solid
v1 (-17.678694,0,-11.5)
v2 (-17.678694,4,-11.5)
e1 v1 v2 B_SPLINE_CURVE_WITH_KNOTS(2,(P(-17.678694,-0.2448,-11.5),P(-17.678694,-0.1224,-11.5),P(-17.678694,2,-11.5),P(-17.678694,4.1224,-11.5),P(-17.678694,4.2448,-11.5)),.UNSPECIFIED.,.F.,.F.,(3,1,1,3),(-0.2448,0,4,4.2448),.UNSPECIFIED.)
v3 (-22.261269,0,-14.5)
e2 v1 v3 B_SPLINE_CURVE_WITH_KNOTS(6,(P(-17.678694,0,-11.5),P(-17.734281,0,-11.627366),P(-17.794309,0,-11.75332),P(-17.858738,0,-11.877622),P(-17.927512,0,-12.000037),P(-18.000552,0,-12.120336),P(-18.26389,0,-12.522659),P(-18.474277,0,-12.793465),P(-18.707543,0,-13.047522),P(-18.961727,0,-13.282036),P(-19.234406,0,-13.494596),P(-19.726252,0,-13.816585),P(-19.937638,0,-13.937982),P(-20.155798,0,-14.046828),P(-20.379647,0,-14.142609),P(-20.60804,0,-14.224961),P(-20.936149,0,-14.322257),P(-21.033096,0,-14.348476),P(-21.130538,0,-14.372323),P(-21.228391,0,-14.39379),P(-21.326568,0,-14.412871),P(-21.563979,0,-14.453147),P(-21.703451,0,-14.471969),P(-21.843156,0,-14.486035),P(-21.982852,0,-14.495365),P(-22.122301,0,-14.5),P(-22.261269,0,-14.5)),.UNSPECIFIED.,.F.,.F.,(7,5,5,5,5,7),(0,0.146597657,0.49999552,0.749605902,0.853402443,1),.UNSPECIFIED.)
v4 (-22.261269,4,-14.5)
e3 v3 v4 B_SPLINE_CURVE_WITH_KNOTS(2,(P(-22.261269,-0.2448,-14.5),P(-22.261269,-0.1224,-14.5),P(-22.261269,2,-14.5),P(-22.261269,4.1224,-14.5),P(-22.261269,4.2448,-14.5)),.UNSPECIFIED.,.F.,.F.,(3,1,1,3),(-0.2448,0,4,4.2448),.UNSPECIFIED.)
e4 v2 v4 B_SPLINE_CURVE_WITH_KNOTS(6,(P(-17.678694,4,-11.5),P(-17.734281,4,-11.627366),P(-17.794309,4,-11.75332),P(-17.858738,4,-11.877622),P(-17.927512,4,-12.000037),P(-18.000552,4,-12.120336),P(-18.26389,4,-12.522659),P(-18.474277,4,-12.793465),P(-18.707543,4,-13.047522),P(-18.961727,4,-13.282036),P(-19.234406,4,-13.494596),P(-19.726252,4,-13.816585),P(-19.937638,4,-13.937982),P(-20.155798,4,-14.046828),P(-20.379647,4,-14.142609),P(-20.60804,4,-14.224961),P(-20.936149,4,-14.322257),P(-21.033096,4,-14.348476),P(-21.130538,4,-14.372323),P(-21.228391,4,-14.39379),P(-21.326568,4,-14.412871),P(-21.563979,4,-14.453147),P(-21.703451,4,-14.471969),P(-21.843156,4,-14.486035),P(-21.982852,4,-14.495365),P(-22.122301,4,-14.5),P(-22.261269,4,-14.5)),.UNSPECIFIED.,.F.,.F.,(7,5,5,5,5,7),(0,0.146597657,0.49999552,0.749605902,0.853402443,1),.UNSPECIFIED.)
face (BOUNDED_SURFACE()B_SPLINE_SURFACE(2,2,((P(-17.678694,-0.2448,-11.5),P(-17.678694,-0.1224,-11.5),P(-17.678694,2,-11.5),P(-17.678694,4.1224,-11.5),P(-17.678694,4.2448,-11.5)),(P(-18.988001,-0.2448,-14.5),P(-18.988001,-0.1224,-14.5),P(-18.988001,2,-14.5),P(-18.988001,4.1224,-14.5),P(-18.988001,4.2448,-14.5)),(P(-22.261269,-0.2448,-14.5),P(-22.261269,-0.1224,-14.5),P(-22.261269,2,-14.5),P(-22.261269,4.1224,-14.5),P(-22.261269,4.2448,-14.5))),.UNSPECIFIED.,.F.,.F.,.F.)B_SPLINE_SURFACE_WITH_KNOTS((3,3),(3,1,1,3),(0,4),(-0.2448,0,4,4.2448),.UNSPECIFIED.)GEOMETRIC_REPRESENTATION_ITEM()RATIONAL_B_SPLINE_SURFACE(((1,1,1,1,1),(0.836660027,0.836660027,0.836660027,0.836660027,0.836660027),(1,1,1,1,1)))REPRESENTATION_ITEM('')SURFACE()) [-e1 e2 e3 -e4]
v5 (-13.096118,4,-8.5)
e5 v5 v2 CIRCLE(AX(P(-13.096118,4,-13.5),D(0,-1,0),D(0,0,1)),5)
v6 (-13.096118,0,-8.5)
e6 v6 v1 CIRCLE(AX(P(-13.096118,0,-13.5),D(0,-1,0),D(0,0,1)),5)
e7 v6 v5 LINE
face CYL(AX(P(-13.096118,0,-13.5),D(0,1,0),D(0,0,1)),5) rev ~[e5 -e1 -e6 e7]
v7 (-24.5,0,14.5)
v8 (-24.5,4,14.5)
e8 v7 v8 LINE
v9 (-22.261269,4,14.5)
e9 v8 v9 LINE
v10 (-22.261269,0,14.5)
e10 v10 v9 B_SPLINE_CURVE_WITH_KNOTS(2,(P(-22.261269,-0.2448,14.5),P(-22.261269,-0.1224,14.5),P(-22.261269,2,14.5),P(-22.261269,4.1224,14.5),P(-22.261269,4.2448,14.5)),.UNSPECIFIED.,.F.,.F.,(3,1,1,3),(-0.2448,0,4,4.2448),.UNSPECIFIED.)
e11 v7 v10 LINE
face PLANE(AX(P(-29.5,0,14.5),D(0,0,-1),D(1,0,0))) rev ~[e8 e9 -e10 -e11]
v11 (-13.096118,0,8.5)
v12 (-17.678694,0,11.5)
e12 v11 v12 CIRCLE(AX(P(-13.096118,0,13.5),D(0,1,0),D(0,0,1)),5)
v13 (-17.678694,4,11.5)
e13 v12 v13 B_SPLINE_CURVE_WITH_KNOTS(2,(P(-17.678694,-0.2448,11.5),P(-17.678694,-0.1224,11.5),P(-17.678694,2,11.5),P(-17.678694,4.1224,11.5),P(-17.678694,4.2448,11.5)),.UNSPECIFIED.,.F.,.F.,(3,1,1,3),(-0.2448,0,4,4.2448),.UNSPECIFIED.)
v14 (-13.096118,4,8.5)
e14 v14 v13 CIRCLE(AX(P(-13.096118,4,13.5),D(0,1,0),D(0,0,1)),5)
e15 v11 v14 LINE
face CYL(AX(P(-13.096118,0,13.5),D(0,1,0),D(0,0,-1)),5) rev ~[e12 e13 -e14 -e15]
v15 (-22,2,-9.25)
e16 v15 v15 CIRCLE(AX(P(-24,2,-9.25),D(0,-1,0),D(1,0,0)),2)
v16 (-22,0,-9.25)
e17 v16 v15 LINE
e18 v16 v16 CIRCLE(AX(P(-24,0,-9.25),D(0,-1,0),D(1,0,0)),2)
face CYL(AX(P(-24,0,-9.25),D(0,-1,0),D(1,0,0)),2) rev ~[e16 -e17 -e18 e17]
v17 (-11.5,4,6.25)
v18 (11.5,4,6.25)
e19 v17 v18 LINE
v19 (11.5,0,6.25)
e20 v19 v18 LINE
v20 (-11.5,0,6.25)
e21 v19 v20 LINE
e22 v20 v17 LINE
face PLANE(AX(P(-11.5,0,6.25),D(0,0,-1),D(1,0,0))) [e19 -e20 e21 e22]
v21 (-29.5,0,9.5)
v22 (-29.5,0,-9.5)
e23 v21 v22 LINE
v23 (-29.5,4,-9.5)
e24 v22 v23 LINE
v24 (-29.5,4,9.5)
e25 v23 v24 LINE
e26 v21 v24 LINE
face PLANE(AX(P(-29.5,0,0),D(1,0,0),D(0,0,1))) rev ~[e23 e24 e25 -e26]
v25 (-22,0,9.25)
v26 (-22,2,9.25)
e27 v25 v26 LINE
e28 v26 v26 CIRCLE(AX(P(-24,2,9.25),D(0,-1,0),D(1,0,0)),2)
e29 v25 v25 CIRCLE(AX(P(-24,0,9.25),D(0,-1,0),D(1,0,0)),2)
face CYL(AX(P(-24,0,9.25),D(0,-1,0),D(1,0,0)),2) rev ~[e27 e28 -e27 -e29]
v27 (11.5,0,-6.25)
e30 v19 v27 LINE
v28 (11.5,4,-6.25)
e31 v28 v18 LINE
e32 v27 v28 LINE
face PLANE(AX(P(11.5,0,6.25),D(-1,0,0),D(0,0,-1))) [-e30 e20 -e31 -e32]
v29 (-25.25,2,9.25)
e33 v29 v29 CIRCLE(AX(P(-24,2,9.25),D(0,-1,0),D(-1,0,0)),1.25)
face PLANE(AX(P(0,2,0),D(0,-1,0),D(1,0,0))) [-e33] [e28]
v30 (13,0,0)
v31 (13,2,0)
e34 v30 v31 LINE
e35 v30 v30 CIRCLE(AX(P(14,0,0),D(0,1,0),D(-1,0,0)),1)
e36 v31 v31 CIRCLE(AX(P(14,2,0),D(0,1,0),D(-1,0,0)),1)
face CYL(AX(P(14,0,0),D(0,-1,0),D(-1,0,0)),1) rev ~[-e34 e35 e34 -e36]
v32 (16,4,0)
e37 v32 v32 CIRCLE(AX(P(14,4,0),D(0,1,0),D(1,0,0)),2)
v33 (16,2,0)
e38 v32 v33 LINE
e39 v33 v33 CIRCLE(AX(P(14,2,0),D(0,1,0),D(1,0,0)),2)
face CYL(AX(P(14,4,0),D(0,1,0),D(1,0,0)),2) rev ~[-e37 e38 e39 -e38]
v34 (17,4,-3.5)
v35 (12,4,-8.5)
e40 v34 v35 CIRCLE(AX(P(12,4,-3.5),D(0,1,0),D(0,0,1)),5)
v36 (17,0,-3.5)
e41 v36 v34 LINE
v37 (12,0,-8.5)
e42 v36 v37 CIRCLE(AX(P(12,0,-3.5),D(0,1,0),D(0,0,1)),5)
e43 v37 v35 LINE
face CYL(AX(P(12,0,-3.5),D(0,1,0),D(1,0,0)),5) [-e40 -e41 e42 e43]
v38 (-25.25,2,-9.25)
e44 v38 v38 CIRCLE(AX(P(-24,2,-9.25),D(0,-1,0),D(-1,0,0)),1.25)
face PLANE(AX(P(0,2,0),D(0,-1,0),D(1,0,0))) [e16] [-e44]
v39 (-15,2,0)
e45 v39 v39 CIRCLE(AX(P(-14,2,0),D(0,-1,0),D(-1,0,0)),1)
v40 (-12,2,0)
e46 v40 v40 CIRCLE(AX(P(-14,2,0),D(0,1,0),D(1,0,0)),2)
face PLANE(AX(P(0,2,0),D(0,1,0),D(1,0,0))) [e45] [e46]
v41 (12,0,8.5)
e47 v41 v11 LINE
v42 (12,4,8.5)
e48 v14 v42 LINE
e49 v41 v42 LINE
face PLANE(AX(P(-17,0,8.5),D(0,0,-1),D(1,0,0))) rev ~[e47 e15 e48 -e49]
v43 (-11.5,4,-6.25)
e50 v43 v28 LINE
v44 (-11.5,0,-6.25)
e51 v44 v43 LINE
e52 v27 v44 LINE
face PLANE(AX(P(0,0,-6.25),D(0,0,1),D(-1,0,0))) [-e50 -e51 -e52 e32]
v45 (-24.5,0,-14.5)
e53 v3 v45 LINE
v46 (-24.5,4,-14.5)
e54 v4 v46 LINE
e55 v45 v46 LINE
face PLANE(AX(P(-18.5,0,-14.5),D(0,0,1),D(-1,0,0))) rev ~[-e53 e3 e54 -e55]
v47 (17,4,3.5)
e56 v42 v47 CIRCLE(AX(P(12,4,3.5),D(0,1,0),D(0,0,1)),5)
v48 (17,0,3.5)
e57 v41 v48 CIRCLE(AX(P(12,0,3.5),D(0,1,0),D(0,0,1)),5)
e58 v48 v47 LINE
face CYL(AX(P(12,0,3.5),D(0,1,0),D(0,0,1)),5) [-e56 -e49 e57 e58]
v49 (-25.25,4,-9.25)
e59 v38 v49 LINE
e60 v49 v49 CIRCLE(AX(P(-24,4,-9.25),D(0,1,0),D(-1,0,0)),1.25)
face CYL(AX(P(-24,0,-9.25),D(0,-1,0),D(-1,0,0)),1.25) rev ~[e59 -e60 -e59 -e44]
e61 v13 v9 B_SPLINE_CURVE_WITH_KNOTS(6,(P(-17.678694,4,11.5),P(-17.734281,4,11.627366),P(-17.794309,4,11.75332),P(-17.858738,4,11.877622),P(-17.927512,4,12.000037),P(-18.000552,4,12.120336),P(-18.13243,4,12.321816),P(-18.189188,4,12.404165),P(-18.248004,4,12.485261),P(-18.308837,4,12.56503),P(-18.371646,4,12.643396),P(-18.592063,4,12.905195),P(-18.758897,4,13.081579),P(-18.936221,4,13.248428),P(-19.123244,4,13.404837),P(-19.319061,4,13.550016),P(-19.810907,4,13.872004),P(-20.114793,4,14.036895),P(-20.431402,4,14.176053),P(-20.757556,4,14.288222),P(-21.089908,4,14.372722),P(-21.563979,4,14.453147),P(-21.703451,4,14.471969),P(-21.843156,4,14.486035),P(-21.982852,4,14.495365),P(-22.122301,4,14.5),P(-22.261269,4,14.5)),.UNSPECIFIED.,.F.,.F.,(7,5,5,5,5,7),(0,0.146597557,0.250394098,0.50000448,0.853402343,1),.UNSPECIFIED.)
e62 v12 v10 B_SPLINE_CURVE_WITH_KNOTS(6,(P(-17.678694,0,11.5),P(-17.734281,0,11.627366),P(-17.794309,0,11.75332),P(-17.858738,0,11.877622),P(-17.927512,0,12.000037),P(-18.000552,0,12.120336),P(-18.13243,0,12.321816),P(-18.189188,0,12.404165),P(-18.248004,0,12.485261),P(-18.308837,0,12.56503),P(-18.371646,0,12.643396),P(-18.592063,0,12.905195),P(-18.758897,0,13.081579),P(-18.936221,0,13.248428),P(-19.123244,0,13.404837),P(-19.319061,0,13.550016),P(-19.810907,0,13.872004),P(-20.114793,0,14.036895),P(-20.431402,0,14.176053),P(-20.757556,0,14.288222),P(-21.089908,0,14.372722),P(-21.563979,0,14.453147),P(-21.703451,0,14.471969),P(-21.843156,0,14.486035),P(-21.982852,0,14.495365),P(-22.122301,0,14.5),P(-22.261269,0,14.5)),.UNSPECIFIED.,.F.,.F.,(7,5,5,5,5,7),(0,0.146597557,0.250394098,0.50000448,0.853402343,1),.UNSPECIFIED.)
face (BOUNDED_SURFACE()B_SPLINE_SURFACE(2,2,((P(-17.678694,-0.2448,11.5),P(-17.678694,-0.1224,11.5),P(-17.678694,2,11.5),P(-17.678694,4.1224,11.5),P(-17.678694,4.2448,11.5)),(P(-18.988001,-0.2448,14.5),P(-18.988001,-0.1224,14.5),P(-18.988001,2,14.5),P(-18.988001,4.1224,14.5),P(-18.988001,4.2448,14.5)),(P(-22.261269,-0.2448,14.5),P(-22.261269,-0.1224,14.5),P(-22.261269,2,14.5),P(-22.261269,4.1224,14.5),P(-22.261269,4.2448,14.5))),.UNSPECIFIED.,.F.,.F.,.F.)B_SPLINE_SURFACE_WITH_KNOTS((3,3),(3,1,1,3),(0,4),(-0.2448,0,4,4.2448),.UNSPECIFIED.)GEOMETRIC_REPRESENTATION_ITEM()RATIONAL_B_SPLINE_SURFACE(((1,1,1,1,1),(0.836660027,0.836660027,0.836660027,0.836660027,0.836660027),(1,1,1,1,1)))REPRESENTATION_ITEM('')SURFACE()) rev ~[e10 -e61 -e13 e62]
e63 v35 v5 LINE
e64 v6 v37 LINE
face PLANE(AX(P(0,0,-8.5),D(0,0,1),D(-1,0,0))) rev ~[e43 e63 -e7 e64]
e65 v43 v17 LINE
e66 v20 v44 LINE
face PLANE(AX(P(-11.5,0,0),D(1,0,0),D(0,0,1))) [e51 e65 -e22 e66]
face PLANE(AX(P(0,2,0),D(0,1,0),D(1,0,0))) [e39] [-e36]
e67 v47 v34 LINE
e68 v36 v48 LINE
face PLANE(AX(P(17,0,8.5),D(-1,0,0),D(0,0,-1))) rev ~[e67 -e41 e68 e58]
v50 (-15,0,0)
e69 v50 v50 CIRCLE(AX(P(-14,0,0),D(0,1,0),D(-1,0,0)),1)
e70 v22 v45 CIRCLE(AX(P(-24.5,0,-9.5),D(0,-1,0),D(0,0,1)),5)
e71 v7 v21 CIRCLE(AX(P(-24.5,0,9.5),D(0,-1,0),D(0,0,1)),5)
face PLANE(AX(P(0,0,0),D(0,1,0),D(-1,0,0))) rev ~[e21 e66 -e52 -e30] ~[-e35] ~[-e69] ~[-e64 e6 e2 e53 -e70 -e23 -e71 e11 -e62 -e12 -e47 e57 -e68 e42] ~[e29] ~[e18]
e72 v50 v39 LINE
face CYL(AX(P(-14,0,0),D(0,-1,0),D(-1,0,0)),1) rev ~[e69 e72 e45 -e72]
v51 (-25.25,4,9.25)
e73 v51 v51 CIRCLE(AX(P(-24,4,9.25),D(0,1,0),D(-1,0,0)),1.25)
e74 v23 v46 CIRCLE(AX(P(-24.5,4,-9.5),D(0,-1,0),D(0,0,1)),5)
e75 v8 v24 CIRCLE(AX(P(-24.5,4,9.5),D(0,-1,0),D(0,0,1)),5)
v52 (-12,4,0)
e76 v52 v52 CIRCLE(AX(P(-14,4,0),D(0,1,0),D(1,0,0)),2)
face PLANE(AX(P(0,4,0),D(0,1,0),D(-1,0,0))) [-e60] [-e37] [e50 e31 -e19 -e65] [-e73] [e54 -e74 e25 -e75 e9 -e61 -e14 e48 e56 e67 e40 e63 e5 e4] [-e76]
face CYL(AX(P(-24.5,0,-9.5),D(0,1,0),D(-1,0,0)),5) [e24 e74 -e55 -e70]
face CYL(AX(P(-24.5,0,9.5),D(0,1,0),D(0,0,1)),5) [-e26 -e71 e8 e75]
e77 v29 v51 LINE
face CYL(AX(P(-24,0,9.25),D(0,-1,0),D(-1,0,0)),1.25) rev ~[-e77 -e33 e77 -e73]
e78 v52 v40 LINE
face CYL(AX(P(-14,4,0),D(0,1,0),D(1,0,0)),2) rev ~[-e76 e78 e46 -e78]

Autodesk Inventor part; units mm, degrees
ref_plane "YZ Plane" through (0, 0, 0) normal (1, 0, 0) x (0, 1, 0)
ref_plane "XZ Plane" through (0, 0, 0) normal (0, 1, 0) x (-1, 0, 0)
ref_plane "XY Plane" through (0, 0, 0) normal (0, 0, 1) x (1, 0, 0)
sketch "Sketch1" plane through (0, 0, 0) normal (0, 1, 0) x (-1, 0, 0)
  line L0 (11.5, 6.25) -> (-11.5, 6.25)
  line L1 (-11.5, 6.25) -> (-11.5, -6.25)
  line L2 (-11.5, -6.25) -> (11.5, -6.25)
  line L3 (11.5, -6.25) -> (11.5, 6.25)
  line L4 (11.5, 6.25) -> (-11.5, -6.25) construction
  line L5 (-11.5, 6.25) -> (11.5, -6.25) construction
  line L6 (17, 8.5) -> (-17, 8.5)
  line L7 (-17, 8.5) -> (-17, -8.5)
  line L8 (-17, -8.5) -> (17, -8.5)
  line L9 (17, -8.5) -> (17, 8.5) construction
  line L10 (17, 8.5) -> (-17, -8.5) construction
  line L11 (-17, 8.5) -> (17, -8.5) construction
  line L12 (38.8, 0) -> (-26.3, 0) projected
  line L13 (0, -20.3) -> (0, 20.3) projected
  line L14 (29.5, 14.5) -> (18.5, 14.5)
  line L15 (18.5, 14.5) -> (18.5, -14.5) construction
  line L16 (18.5, -14.5) -> (29.5, -14.5)
  line L17 (29.5, -14.5) -> (29.5, 14.5)
  line L18 (29.5, 14.5) -> (18.5, -14.5) construction
  line L19 (18.5, 14.5) -> (29.5, -14.5) construction
  line L20 (18.5, 14.5) -> (17, 8.5)
  line L21 (17, -8.5) -> (18.5, -14.5)
  circle A0 centre (-14, 0) radius 1
  circle A1 centre (14, 0) radius 1
  circle A2 centre (24, 9.25) radius 1.25
  circle A3 centre (24, -9.25) radius 1.25
  point P0 (0, 0)
  point P1 (24, 0)
  dimension "d0" = 23
  dimension "d1" = 12.5
  dimension "d2" = 17
  dimension "d3" = 34
  dimension "d11" = 2
  dimension "d12" = 28
  dimension "d13" = 12.5
  dimension "d14" = 2.5
  dimension "d15" = 9.25
  dimension "d16" = 29
  dimension "d18" = 5.5
extrude "Extrusion1" add sketch "Sketch1" along normal blind 4 contours L0 L13 L6 L20 L14 L17 L12 A1 L3 | L0 L1 L12 A0 L7 L6 L13 | L12 A1 L17 L16 L21 L8 L13 L2 L3 | L1 L2 L13 L8 L7 L12 A0
sketch "Sketch2" plane through (0, 4, 0) normal (0, 1, 0) x (1, 0, 0)
  circle A0 centre (14, 0) radius 1 projected
  circle A1 centre (14, 0) radius 2
  line L0 (0, 20.3) -> (0, -20.3) projected
  circle A2 centre (-14, 0) radius 2
  point P0 (0, 0)
  dimension "d21" = 4
extrude "Extrusion2" cut sketch "Sketch2" against normal blind 2
sketch "Sketch3" plane through (0, 0, 0) normal (0, -1, 0) x (1, 0, 0)
  line L0 (-38.8, 0) -> (26.3, 0) projected
  circle A0 centre (-24, 9.25) radius 1.25 projected
  circle A1 centre (-24, 9.25) radius 2
  circle A2 centre (-24, -9.25) radius 2
  point P0 (0, 0)
  dimension "d24" = 4
extrude "Extrusion3" cut sketch "Sketch3" against normal blind 2 contours A0 | A1 | A2
fillet "Fillet1" radius 5 8 edges at (-18.5, 2, 14.5) (-17, 2, 8.5) (-29.5, 2, 14.5) (-29.5, 2, -14.5) (-18.5, 2, -14.5) (-17, 2, -8.5) (17, 2, -8.5) (17, 2, 8.5)
properties part number "mount1"
